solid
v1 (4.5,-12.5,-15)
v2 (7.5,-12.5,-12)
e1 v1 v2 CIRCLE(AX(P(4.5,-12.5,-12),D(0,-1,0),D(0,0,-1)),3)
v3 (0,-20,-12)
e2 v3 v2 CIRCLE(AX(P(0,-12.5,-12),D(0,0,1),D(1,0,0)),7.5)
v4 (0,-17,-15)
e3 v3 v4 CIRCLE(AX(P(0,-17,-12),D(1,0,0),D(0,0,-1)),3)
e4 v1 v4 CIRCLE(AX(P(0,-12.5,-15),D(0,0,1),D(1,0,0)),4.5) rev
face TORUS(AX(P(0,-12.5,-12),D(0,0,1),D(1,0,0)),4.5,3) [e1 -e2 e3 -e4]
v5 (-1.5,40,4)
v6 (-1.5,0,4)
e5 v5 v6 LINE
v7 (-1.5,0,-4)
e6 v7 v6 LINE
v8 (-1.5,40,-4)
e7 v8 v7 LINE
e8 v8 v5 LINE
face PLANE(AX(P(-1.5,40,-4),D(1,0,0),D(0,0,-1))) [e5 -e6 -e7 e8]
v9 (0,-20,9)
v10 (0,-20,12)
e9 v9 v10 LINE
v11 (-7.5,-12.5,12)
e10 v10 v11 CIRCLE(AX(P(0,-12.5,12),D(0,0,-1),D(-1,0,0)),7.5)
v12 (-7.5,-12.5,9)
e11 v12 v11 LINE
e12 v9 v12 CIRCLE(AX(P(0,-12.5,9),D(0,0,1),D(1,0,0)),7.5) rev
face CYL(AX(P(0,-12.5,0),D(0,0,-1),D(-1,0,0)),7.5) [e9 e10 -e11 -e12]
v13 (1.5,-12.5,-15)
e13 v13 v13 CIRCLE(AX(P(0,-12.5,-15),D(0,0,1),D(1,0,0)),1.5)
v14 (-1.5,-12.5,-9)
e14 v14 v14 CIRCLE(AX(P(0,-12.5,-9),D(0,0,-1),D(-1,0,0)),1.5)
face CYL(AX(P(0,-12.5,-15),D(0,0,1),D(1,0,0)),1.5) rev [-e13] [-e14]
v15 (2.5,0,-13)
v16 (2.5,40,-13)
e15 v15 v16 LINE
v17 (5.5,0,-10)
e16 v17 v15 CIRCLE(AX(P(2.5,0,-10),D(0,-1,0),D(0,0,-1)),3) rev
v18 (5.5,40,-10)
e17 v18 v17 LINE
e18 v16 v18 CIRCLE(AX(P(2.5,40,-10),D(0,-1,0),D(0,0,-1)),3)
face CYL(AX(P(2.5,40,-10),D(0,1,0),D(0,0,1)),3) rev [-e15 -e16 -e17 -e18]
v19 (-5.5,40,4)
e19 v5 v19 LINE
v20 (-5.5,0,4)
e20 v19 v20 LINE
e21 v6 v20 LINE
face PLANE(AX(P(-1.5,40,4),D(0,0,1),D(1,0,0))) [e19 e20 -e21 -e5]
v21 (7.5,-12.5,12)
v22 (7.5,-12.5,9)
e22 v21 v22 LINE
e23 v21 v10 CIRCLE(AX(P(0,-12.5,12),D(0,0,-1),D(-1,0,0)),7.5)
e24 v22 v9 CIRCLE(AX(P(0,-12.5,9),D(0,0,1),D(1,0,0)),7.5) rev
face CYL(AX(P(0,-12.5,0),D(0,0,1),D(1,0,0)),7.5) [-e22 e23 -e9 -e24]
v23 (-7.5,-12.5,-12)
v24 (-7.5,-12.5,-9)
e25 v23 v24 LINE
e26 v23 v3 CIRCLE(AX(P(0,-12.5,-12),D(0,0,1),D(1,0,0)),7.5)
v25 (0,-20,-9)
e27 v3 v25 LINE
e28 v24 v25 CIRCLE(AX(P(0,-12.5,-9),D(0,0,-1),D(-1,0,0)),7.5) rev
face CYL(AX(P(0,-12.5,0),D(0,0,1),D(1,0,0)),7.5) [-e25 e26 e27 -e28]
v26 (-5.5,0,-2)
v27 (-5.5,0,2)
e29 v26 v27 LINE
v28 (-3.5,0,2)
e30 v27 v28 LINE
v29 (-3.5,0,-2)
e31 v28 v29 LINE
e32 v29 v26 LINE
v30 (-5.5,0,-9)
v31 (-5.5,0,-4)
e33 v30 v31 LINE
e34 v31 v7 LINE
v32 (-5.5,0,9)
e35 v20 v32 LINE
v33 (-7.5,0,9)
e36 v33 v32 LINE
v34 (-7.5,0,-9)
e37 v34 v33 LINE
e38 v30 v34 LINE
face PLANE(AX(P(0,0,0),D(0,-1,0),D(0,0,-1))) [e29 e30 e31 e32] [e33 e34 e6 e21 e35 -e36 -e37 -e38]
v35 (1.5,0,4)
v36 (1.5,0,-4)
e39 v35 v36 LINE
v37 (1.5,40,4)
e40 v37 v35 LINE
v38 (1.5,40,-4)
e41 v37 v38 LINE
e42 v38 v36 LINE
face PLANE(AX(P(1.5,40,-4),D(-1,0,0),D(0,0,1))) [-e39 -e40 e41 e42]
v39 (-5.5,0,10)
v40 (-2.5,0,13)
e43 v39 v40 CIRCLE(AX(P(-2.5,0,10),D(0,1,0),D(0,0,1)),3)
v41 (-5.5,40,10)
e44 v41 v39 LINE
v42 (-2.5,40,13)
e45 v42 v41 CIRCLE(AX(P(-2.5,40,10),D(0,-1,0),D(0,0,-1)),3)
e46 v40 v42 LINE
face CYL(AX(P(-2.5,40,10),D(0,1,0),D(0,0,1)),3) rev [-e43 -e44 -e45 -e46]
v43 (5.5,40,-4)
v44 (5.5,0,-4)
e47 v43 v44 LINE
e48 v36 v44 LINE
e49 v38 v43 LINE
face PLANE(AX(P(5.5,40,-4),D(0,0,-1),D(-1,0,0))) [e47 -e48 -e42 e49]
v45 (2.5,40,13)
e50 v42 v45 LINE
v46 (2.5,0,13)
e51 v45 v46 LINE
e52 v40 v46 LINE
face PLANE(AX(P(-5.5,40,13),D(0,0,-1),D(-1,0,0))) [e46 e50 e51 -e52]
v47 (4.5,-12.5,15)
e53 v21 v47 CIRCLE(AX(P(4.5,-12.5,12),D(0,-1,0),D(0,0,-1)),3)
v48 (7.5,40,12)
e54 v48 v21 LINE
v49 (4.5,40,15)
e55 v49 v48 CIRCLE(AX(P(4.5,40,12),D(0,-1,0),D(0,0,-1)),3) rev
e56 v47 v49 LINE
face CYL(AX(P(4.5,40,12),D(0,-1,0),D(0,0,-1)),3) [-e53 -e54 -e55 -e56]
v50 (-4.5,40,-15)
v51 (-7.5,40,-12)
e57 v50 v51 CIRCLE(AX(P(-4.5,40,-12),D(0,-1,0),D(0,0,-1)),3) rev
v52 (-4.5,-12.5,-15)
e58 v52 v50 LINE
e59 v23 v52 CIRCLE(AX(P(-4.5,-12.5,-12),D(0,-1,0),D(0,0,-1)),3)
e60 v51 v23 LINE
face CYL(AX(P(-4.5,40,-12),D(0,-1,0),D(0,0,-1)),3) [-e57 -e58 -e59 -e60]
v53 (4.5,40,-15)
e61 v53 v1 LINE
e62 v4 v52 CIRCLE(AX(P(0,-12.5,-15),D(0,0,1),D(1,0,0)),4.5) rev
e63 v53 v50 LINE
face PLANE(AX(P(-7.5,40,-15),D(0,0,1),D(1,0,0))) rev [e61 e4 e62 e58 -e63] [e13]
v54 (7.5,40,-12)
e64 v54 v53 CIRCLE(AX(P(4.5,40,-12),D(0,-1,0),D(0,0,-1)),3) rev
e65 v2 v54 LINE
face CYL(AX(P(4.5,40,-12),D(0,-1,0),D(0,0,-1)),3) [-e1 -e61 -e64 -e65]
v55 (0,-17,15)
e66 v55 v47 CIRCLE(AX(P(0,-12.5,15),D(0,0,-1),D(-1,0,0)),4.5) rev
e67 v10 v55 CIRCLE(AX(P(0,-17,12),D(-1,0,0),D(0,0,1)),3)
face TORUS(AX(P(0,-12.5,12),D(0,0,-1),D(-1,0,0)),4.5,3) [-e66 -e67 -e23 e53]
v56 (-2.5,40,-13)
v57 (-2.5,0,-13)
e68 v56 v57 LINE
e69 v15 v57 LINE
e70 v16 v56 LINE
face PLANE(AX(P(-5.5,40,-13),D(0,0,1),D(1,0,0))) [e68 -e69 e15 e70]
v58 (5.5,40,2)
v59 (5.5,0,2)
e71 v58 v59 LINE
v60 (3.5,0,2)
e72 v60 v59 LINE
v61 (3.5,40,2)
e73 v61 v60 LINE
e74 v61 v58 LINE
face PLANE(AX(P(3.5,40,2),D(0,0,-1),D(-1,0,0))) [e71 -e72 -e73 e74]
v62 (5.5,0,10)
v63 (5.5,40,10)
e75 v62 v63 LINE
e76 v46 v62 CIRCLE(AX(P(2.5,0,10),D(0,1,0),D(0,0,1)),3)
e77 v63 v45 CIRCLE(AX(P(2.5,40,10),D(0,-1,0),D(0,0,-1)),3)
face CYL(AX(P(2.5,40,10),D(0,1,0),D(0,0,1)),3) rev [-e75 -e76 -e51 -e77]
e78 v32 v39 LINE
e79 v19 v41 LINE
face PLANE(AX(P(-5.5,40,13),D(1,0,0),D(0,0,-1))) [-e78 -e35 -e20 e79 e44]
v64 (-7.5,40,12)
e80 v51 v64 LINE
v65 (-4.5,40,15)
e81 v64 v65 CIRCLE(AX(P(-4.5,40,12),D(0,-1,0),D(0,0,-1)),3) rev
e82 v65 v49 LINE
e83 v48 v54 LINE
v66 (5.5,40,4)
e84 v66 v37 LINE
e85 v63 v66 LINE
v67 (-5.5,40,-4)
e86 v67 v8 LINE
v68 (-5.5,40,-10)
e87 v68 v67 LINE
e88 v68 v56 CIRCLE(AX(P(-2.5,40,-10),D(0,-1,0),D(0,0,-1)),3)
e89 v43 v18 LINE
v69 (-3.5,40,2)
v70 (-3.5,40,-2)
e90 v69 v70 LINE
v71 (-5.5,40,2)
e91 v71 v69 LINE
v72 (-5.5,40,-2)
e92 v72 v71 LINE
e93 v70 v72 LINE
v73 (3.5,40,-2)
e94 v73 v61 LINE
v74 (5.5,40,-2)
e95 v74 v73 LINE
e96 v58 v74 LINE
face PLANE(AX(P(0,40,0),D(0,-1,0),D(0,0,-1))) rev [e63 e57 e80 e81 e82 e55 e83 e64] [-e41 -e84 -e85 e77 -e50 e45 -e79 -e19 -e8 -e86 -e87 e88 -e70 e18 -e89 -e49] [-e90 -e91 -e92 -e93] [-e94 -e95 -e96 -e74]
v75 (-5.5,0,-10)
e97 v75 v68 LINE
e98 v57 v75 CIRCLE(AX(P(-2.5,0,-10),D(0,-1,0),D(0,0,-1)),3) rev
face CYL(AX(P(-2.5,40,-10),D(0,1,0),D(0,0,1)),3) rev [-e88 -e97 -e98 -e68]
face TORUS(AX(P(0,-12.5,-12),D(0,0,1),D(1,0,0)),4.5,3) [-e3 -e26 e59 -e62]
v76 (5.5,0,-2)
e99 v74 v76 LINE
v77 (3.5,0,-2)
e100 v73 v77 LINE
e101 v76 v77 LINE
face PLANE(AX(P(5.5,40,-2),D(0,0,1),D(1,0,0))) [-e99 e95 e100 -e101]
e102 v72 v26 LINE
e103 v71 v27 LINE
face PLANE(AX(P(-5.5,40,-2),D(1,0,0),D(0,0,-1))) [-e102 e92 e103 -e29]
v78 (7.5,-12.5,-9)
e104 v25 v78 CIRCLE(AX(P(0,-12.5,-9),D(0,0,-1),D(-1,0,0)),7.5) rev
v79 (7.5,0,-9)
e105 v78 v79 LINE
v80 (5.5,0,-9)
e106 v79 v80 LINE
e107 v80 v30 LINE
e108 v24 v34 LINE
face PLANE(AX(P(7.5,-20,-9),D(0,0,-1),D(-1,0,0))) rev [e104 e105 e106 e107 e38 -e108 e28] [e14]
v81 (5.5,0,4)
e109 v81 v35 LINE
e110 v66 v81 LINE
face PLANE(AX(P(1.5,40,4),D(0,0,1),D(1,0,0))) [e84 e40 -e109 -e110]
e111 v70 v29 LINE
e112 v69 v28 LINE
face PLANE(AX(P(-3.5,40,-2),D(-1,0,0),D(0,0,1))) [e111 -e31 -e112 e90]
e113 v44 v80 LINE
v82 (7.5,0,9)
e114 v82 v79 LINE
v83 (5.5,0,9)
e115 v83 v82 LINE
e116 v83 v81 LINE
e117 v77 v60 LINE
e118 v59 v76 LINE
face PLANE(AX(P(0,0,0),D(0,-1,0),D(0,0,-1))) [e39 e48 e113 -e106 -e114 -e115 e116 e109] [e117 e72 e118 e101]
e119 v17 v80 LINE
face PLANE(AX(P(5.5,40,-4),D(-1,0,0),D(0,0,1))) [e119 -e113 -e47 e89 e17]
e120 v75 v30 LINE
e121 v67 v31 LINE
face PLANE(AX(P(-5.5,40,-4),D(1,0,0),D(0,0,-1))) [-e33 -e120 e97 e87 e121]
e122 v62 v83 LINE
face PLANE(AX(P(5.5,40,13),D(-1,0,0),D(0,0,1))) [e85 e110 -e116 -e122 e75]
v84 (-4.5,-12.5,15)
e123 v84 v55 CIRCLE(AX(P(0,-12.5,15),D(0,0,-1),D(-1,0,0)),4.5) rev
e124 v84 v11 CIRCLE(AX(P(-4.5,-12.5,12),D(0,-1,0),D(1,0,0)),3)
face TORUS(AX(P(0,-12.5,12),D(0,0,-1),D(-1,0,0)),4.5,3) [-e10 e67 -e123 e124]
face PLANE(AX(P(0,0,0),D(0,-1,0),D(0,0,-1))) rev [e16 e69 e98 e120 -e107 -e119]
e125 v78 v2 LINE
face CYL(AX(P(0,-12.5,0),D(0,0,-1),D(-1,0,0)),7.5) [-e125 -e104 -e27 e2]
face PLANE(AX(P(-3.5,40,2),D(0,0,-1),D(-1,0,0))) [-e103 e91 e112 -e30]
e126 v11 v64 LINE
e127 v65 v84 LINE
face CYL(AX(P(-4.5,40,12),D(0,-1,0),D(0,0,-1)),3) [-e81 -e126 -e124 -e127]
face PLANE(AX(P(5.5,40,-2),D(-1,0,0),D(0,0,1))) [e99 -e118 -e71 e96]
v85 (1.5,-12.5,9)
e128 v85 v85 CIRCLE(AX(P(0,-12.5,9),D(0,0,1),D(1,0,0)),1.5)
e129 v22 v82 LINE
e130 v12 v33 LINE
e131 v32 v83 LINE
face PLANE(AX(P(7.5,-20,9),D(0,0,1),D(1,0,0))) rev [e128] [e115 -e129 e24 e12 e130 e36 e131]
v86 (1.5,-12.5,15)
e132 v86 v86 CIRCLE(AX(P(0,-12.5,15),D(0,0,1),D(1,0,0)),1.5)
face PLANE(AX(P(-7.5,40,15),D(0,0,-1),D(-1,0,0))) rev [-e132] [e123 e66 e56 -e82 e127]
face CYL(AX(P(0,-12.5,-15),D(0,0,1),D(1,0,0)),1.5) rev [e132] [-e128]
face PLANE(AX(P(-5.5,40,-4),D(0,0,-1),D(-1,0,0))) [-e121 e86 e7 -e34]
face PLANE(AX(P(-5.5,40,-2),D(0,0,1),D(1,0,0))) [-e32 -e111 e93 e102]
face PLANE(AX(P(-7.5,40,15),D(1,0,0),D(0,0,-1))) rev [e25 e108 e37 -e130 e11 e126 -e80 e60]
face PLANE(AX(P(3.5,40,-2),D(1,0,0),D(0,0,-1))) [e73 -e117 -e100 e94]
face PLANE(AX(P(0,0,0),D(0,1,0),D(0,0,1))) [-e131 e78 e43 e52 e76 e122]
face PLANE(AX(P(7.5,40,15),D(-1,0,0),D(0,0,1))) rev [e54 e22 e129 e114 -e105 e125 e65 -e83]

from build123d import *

# Parameters (mm, degrees)
SKETCH1_W           = 15
SKETCH1_H           = 30
SKETCH1_W_2         = 2
SKETCH1_H_2         = 4
BOSS_EXTRUDE1_DEPTH = 40
SKETCH2_W           = 15
SKETCH2_H           = 6
BOSS_EXTRUDE2_DEPTH = 20
FILLET1_R           = 7.5
SKETCH3_R           = 1.5
CUT_EXTRUDE1_DEPTH  = 51.55937104
FILLET2_R           = 3


with BuildPart() as part:
    # Sketch1 → Boss-Extrude1 (new body)
    with BuildSketch(Plane(origin=(0, 0, 0), x_dir=(1, 0, 0), z_dir=(0, 1, 0))):
        Rectangle(SKETCH1_W, SKETCH1_H)
        Polygon((-5.5, -13), (5.5, -13), (5.5, -4), (1.5, -4), (1.5, 4), (5.5, 4), (5.5, 13), (-5.5, 13), (-5.5, 4), (-1.5, 4), (-1.5, -4), (-5.5, -4), align=None, mode=Mode.SUBTRACT)
        with Locations((-4.5, 0)):
            Rectangle(SKETCH1_W_2, SKETCH1_H_2, mode=Mode.SUBTRACT)
        with Locations((4.5, 0)):
            Rectangle(SKETCH1_W_2, SKETCH1_H_2, mode=Mode.SUBTRACT)
    extrude(amount=BOSS_EXTRUDE1_DEPTH)

    # Sketch2 → Boss-Extrude2 (add)
    with BuildSketch(Plane.XZ):
        with Locations((0, 12)):
            Rectangle(SKETCH2_W, SKETCH2_H)
        with Locations((0, -12)):
            Rectangle(SKETCH2_W, SKETCH2_H)
    extrude(amount=BOSS_EXTRUDE2_DEPTH)

    # Fillet1
    fillet1_edges = [part.edges().sort_by_distance(p)[0] for p in [
        (-7.5, -20, 12),
        (-7.5, -20, -12),
        (7.5, -20, -12),
        (7.5, -20, 12),
    ]]
    fillet(fillet1_edges, radius=FILLET1_R - 0.0001)  # a hair under: the kernel refuses the full size

    # Sketch3 → Cut-Extrude1 (cut, through all)
    with BuildSketch(Plane.XY.offset(15)):
        with Locations((0, -12.5)):
            Circle(SKETCH3_R)
    extrude(amount=-CUT_EXTRUDE1_DEPTH, mode=Mode.SUBTRACT)

    # Fillet2
    fillet2_edges = [part.edges().sort_by_distance(p)[0] for p in [
        (5.303330148, -17.803330148, 15),
        (-5.303330148, -17.803330148, 15),
        (5.303330148, -17.803330148, -15),
        (-5.303330148, -17.803330148, -15),
        (5.5, 20, -13),
        (-5.5, 20, -13),
        (-5.5, 20, 13),
        (5.5, 20, 13),
        (7.5, 13.74995, 15),
        (-7.5, 13.74995, 15),
        (-7.5, 13.74995, -15),
        (7.5, 13.74995, -15),
    ]]
    fillet(fillet2_edges, radius=FILLET2_R)


solid = part.part
